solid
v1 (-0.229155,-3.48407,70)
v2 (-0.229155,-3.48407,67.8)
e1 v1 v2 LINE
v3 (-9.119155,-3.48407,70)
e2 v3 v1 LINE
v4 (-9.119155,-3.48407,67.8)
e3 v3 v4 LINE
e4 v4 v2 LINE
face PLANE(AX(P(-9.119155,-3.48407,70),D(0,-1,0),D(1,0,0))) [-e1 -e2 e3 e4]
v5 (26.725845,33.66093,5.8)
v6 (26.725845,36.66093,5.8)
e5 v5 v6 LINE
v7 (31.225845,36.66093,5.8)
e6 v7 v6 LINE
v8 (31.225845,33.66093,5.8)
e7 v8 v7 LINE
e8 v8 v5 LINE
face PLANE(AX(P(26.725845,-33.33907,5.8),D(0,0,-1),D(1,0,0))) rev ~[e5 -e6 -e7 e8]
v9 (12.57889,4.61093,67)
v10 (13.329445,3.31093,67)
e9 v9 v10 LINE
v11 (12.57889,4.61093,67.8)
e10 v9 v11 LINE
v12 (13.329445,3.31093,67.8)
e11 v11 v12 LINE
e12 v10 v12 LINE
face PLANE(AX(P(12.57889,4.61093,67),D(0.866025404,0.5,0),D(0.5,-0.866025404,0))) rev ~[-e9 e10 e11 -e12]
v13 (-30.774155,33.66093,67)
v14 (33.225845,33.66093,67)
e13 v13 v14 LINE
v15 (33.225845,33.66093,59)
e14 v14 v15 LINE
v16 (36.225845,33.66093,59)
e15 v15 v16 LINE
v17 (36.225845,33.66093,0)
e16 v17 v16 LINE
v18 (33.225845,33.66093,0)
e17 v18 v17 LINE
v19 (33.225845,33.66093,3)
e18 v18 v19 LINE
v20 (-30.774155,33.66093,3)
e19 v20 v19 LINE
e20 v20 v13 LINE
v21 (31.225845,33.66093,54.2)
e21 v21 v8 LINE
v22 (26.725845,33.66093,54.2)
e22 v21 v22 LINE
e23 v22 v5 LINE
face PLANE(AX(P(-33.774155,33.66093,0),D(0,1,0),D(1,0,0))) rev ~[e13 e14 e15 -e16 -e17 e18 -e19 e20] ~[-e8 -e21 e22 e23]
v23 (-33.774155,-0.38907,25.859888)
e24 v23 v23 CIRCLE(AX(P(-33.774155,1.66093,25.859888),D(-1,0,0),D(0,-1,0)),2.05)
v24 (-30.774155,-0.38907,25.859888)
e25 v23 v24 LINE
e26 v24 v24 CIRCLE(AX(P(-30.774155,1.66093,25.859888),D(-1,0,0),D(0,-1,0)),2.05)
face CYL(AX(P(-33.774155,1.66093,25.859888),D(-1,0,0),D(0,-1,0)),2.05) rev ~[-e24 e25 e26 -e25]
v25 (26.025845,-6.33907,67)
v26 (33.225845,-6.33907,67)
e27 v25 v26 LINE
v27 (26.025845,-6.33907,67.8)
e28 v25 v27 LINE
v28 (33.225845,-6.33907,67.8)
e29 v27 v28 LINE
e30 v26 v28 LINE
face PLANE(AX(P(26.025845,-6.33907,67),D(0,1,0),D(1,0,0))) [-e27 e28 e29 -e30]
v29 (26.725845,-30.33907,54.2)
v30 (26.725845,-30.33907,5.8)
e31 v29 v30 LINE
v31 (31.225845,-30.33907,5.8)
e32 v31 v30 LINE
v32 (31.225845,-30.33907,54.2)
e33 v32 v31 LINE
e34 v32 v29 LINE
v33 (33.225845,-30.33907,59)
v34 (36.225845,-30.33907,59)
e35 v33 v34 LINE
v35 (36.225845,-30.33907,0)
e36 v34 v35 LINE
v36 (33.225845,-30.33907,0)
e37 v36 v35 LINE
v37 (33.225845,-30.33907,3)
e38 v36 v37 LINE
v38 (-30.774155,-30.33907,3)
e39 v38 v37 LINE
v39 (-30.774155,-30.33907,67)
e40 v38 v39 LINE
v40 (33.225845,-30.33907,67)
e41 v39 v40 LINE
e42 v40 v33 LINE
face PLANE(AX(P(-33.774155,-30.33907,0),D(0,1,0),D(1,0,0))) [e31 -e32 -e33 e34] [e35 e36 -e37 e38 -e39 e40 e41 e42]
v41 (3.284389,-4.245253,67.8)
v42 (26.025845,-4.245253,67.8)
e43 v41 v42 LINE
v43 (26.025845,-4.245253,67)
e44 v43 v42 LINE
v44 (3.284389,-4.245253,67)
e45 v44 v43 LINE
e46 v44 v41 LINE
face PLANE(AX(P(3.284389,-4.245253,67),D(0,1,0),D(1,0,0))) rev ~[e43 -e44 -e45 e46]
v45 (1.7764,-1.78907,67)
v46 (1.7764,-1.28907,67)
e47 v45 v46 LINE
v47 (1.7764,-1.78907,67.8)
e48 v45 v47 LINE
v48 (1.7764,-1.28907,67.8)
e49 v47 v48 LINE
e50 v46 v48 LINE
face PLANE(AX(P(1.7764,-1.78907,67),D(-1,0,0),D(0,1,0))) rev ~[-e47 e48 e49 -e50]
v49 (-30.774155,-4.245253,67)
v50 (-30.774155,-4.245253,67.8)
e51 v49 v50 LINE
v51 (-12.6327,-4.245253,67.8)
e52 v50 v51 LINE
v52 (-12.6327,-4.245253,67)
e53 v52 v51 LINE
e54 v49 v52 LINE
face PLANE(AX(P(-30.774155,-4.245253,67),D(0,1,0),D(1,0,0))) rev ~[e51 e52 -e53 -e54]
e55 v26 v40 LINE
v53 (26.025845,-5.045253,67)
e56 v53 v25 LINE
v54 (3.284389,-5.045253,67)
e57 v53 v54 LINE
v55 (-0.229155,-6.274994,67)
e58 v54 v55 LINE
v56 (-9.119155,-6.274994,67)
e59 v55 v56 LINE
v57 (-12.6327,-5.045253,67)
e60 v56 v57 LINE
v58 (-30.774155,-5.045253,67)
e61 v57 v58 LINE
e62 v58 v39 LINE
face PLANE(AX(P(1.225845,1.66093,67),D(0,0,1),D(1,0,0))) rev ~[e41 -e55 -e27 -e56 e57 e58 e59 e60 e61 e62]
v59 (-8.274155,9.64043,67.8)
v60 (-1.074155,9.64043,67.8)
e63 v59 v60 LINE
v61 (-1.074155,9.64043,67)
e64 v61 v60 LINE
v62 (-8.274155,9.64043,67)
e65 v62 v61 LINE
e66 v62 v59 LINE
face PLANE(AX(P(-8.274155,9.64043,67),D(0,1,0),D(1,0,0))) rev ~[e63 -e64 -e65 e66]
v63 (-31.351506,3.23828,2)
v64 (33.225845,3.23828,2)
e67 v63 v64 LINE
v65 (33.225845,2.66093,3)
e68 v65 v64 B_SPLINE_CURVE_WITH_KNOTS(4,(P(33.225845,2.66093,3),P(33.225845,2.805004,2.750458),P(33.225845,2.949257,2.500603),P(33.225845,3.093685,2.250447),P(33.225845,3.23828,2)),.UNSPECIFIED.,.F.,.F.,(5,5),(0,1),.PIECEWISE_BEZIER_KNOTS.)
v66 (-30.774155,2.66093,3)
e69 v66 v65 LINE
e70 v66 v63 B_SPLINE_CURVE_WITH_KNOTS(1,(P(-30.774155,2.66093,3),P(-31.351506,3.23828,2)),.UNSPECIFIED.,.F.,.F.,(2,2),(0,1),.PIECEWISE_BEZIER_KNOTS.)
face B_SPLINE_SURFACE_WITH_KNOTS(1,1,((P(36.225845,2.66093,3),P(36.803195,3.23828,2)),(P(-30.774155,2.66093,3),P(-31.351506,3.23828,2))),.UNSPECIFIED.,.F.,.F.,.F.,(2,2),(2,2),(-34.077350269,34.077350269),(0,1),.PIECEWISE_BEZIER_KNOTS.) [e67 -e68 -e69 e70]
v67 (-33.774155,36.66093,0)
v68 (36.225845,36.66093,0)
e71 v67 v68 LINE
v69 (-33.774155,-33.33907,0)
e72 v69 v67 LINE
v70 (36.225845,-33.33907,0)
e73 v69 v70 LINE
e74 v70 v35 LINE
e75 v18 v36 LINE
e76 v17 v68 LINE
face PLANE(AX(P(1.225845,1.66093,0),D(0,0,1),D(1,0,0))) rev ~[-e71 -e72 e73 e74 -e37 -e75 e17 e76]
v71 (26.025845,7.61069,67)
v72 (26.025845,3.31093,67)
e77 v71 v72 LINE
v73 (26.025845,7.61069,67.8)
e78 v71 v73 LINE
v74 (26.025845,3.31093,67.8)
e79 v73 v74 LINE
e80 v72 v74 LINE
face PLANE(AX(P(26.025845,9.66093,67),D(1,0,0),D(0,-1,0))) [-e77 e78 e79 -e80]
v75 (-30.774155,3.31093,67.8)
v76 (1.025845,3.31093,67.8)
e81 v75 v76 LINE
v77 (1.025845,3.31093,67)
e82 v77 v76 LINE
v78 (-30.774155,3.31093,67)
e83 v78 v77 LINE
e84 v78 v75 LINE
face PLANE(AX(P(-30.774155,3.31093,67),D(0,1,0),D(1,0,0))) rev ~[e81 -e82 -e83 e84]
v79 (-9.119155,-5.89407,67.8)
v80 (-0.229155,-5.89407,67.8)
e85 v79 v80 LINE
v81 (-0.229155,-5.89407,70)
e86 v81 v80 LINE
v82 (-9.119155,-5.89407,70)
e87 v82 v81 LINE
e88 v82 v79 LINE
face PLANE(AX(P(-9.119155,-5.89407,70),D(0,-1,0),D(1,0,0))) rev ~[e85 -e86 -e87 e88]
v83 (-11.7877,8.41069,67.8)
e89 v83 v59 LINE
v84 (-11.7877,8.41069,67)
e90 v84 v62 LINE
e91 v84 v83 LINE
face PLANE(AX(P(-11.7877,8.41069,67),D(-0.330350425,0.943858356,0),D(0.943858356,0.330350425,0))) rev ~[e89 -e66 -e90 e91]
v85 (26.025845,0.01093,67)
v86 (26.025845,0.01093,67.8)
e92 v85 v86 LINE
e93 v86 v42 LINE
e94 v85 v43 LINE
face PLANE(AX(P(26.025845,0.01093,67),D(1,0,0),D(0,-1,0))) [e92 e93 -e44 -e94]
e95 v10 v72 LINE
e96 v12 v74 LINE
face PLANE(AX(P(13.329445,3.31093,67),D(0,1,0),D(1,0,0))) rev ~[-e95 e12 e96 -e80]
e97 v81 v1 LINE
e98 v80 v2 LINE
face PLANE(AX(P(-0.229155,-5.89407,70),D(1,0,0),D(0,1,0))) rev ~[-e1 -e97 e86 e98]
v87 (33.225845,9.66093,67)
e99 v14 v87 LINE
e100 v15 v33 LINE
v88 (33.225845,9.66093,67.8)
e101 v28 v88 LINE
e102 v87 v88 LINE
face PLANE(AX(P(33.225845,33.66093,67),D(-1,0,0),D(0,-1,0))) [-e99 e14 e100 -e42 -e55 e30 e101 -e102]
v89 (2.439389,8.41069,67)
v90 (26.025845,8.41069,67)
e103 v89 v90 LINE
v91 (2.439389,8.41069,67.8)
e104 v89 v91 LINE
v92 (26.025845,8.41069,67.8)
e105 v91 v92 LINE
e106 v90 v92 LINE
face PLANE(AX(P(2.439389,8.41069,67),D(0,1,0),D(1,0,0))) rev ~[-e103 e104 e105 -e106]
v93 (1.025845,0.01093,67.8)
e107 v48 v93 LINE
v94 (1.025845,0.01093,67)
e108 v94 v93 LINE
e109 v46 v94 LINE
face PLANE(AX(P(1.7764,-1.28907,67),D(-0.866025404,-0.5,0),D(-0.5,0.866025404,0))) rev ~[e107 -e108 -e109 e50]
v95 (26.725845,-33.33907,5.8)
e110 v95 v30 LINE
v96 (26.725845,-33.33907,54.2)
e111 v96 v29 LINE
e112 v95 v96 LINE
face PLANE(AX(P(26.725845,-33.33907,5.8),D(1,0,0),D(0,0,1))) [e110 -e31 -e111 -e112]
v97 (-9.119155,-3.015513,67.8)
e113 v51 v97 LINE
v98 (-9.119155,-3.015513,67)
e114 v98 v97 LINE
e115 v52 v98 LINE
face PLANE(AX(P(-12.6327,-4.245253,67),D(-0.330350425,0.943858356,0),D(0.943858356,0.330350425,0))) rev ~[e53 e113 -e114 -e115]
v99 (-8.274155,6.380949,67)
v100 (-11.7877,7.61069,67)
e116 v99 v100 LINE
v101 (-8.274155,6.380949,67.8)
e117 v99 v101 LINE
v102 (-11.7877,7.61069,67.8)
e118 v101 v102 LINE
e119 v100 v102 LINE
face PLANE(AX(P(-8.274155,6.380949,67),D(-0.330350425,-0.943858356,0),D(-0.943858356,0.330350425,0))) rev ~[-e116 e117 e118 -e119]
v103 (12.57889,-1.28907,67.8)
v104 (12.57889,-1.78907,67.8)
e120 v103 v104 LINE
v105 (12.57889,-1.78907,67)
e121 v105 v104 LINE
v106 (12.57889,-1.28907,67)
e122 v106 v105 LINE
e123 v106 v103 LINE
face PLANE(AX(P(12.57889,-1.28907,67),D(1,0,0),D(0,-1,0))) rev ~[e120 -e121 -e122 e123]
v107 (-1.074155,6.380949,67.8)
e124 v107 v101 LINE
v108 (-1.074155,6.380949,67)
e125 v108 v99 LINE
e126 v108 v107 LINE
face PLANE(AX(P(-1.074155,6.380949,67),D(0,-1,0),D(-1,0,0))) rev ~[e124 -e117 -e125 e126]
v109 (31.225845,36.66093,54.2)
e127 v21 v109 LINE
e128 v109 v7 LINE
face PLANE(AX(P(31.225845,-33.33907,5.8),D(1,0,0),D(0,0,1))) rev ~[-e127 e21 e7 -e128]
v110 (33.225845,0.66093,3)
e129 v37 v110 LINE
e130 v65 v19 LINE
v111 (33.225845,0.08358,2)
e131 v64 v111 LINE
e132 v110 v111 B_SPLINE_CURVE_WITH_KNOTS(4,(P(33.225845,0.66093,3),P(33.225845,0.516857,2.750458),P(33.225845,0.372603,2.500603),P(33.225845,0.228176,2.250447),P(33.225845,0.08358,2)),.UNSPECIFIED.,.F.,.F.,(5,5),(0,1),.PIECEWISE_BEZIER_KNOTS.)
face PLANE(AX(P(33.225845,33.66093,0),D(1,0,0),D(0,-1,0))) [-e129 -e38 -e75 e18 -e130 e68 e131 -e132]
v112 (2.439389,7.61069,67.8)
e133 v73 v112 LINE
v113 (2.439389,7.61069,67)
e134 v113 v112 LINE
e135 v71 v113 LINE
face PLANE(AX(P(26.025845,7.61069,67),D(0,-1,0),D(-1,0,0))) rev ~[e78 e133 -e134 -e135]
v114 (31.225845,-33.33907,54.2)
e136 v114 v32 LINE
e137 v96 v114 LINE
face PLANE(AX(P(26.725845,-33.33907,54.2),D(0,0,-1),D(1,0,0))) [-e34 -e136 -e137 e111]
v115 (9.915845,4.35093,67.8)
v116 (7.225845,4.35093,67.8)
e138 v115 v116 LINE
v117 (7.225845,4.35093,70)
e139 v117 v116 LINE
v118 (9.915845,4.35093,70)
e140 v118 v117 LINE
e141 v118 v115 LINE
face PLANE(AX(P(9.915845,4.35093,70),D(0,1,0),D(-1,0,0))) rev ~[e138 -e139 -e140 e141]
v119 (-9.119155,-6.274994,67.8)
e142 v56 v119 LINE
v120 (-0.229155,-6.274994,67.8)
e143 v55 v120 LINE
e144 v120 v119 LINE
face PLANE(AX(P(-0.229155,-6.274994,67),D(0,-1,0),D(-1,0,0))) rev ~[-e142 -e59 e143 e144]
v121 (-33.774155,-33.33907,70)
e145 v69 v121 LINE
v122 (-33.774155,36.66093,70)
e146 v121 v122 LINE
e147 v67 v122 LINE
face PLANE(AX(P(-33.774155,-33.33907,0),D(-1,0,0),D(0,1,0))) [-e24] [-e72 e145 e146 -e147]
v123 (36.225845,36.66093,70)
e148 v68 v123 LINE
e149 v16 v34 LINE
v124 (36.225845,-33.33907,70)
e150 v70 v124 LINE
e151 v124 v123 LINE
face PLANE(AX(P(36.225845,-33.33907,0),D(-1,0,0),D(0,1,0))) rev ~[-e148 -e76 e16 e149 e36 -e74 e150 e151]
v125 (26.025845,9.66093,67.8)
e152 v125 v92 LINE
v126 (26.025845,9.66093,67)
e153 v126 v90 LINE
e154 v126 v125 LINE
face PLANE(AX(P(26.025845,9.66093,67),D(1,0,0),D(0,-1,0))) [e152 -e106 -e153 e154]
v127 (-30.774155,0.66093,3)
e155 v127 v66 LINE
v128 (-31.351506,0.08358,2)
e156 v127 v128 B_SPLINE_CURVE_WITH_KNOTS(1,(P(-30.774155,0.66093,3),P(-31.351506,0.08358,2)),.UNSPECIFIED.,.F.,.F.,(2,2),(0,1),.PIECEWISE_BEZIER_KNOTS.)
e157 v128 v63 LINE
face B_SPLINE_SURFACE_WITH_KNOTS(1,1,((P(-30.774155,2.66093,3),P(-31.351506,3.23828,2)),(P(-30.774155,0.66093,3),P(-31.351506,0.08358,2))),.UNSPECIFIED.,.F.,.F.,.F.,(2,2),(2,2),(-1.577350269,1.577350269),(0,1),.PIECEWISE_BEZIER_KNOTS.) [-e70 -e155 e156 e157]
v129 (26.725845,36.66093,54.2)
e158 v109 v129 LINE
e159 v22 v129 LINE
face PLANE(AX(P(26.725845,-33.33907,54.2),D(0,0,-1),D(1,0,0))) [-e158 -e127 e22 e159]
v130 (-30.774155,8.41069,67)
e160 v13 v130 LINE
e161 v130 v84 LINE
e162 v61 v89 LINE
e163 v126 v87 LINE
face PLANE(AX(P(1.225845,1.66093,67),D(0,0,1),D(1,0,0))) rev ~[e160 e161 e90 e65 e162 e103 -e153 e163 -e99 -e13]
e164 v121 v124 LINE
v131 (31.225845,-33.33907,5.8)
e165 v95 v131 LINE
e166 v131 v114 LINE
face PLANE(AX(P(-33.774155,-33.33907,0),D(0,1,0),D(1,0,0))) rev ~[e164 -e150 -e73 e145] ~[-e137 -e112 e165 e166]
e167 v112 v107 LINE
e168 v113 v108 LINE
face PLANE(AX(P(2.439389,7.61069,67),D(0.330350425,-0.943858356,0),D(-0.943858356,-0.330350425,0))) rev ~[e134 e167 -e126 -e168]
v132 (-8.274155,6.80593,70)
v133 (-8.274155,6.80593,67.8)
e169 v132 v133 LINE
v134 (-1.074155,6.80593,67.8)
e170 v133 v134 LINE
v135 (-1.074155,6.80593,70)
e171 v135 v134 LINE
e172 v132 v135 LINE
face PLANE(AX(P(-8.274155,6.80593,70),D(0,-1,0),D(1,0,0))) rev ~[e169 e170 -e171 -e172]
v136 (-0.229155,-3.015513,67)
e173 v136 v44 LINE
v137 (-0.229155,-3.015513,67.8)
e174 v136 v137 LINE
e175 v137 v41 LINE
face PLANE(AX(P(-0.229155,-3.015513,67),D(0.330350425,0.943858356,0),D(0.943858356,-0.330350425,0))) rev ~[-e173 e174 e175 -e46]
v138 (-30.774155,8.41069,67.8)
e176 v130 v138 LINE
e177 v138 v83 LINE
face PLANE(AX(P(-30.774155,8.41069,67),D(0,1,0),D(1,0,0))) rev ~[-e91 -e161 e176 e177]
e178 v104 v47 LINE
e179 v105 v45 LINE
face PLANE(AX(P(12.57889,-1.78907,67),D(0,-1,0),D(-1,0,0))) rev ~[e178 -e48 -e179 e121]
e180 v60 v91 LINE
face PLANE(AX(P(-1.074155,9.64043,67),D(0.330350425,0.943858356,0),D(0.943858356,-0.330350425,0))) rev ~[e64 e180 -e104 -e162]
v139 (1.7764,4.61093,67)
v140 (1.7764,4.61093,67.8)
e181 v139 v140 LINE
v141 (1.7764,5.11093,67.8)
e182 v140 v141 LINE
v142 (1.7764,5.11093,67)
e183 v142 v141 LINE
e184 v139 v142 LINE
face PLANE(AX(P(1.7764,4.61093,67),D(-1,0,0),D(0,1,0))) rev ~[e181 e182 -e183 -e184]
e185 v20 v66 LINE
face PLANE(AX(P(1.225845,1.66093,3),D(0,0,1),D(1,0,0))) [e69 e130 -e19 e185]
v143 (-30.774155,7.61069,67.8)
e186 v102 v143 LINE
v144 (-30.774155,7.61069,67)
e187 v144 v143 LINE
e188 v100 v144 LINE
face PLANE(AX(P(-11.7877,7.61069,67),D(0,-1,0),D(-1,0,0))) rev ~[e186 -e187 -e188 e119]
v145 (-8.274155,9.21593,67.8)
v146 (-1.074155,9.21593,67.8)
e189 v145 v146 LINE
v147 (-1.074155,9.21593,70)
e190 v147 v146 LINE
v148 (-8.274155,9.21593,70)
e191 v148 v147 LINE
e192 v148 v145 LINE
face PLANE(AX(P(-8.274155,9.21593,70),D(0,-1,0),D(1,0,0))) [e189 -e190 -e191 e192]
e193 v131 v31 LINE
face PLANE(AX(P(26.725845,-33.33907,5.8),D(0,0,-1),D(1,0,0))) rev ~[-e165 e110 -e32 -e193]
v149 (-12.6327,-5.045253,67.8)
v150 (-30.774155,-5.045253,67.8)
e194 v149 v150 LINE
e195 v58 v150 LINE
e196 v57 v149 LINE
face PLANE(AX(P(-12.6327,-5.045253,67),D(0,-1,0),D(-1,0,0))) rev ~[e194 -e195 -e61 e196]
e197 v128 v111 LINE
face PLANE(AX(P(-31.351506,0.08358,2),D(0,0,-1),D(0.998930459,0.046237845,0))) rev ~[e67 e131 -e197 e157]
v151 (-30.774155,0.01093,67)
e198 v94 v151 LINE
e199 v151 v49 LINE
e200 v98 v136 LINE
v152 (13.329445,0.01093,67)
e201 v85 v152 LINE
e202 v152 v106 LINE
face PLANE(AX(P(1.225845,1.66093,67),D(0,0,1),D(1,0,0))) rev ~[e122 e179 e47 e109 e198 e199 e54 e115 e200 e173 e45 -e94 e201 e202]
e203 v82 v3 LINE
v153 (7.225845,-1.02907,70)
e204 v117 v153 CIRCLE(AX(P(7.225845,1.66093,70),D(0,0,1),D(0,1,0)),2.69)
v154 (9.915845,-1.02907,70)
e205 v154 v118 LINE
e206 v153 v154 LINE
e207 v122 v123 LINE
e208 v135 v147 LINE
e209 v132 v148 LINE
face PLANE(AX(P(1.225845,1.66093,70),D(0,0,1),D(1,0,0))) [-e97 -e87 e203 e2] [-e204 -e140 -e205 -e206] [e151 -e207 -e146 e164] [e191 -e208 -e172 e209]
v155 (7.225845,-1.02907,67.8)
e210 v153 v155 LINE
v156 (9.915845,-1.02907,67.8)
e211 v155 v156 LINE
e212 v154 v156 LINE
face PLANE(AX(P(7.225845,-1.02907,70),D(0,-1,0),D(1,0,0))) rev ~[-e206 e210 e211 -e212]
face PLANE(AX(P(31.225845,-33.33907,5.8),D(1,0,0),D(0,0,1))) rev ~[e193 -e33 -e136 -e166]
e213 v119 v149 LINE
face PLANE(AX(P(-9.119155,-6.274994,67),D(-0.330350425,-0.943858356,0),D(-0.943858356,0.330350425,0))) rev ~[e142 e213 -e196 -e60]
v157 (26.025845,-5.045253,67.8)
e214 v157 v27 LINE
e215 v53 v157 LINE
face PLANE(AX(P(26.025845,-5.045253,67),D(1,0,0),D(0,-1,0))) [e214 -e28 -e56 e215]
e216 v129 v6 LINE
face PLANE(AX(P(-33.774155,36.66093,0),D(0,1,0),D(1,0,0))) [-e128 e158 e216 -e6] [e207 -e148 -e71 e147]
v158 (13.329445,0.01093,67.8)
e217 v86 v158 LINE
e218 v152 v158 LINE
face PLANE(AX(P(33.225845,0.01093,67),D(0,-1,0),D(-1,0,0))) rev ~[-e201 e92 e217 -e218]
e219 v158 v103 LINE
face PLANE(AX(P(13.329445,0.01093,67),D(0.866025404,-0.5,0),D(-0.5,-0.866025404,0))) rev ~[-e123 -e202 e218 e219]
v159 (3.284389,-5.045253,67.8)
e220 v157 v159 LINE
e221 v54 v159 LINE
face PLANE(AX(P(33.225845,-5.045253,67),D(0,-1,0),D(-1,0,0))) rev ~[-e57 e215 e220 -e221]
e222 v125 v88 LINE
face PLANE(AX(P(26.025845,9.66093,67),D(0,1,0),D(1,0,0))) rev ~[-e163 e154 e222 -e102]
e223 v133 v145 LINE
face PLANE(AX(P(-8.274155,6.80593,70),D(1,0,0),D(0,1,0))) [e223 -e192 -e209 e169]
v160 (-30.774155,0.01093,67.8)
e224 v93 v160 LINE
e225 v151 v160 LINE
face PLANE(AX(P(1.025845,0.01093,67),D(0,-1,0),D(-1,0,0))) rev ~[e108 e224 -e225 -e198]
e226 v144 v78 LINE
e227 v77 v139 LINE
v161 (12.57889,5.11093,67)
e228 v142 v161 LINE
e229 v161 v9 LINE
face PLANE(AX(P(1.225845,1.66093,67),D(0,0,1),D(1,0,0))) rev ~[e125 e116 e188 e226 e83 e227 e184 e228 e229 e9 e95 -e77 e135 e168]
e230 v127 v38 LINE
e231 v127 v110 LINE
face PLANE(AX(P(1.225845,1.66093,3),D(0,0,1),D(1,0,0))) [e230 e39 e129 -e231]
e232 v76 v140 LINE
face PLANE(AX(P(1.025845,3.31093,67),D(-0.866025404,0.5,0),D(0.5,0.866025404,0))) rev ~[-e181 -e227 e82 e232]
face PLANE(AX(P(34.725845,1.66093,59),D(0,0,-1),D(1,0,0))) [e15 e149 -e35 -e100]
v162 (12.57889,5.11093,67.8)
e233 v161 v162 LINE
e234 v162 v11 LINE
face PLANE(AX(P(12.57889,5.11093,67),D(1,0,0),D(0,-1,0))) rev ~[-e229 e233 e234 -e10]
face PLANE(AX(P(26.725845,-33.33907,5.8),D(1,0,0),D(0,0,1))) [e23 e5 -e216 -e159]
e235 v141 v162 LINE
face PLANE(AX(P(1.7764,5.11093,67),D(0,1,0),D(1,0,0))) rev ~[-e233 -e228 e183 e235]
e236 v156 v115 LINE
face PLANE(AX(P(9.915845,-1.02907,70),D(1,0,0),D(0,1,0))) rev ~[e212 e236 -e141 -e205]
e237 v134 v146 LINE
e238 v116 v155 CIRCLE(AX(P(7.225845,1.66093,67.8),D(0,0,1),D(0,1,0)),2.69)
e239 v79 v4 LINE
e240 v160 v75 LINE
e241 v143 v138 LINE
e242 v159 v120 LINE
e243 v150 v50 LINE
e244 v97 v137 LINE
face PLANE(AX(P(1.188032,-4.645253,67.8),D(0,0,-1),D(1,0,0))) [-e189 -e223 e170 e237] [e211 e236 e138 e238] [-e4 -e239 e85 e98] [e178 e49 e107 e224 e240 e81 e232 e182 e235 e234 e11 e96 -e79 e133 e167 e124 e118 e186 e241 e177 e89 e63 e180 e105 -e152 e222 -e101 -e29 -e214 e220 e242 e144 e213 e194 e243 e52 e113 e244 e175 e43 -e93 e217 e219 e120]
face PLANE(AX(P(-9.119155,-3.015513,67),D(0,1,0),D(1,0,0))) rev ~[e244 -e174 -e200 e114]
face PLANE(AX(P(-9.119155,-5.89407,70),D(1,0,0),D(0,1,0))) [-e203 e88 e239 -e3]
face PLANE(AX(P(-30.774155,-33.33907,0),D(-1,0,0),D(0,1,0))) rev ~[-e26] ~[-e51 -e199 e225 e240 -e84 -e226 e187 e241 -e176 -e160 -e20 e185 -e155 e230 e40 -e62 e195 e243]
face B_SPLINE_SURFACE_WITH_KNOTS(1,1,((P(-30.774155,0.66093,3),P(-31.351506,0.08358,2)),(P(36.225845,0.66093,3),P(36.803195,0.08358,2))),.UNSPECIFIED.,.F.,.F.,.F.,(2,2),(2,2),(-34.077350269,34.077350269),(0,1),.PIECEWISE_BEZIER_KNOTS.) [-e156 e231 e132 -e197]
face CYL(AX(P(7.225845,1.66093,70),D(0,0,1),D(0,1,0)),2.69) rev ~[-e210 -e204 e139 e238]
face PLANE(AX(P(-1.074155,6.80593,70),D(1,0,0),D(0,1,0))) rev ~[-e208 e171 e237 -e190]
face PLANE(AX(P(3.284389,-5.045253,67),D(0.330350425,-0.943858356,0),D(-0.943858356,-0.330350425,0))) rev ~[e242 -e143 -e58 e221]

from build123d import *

# Parameters (mm, degrees)
F0_W      = 70
F0_H      = 70
F1_DEPTH  = 70
F2_T      = -3
F3_W      = 8.89
F3_H      = 2.41
F3_W_2    = 7.2
F4_DEPTH  = 2.54
F5_W      = 3
F5_H      = 64
F6_DEPTH  = 8
F7_R      = 2.05
F8_DEPTH  = 3.302
F9_W      = 4.5
F9_H      = 48.4
F10_DEPTH = 99.568
F11_W     = 67
F11_H     = 2
F12_DEPTH = 1
F12_TAPER = -30
F14_DEPTH = 0.8
F16_DEPTH = 0.8
F17_W     = 7.2
F17_H     = 1.2938163138
F17_H_2   = 4.2561836862
F17_H_3   = 6.35
F18_DEPTH = 0.8
F20_DEPTH = 0.8
F21_W     = 3
F21_H     = 64
F22_DEPTH = 4.6


# Not quite as in the source:
# - a feature names something its author has since deleted; it is built from what else it names


with BuildPart() as f1:
    # F0 (on Top) → F1 (new body)
    with BuildSketch(Plane.XY):
        with Locations((1.2258447155, 1.6609302163)):
            Rectangle(F0_W, F0_H)
    extrude(amount=F1_DEPTH)

    # F2
    f2_openings = [f1.faces().sort_by_distance(p)[0] for p in [
        (36.225845, 1.66093, 35),
    ]]
    offset(amount=F2_T, openings=f2_openings)

    # F3 (on face) → F4 (cut)
    with BuildSketch(Plane.XY.offset(70)):
        with Locations((-4.6741552845, -4.6890697837)):
            Rectangle(F3_W, F3_H)
        with BuildLine():
            ThreePointArc((7.2258447155, -1.0290697837), (9.1279619569, -0.2411870251), (9.9158447155, 1.6609302163))
            ThreePointArc((9.9158447155, 1.6609302163), (9.1279619569, 3.5630474577), (7.2258447155, 4.3509302163))
            ThreePointArc((7.2258447155, 4.3509302163), (4.5358447155, 1.6609302163), (7.2258447155, -1.0290697837))
        make_face()
        with BuildLine():
            Line((9.9158447155, -1.0290697837), (9.9158447155, 1.6609302163))
            ThreePointArc((9.9158447155, 1.6609302163), (9.1279619569, -0.2411870251), (7.2258447155, -1.0290697837))
            Line((7.2258447155, -1.0290697837), (9.9158447155, -1.0290697837))
        make_face()
        with Locations((-4.6741552845, 8.0109302163)):
            Rectangle(F3_W_2, F3_H)
        with BuildLine():
            ThreePointArc((7.2258447155, 4.3509302163), (9.1279619569, 3.5630474577), (9.9158447155, 1.6609302163))
            Line((9.9158447155, 1.6609302163), (9.9158447155, 4.3509302163))
            Line((9.9158447155, 4.3509302163), (7.2258447155, 4.3509302163))
        make_face()
    extrude(amount=-F4_DEPTH, mode=Mode.SUBTRACT)

    # F5 (on face) → F6 (join)
    with BuildSketch(Plane(origin=(0, 0, 67), x_dir=(1, 0, 0), z_dir=(0, 0, -1))):
        with Locations((34.7258447155, -1.6609302163)):
            Rectangle(F5_W, F5_H)
    extrude(amount=F6_DEPTH)

    # F7 (on face) → F8 (cut)
    with BuildSketch(Plane(origin=(-33.7741552845, 0, 0), x_dir=(0, -1, 0), z_dir=(-1, 0, 0))):
        with Locations((-1.6609302163, 25.8598876931)):
            Circle(F7_R)
    extrude(amount=-F8_DEPTH, mode=Mode.SUBTRACT)

    # F9 (on face) → F10 (cut)
    with BuildSketch(Plane.XZ.offset(33.3390697837)):
        with Locations((28.9758447155, 30)):
            Rectangle(F9_W, F9_H)
    extrude(amount=-F10_DEPTH, mode=Mode.SUBTRACT)

    # F11 (on face) → F12 (cut)
    with BuildSketch(Plane.XY.offset(3)):
        with Locations((2.7258447155, 1.6609302163)):
            Rectangle(F11_W, F11_H)
    extrude(amount=-F12_DEPTH, taper=F12_TAPER, mode=Mode.SUBTRACT)

    # F13 (on face) → F14 (cut)
    with BuildSketch(Plane(origin=(0, 0, 67), x_dir=(1, 0, 0), z_dir=(0, 0, -1))):
        Polygon((-30.7741552845, -0.0109302163), (-30.7741552845, -3.3109302163), (1.0258447155, -3.3109302163), (1.7764000655, -4.6109302163), (1.7764000655, -5.1109302163), (12.5788900655, -5.1109302163), (12.5788900655, -4.6109302163), (13.3294454154, -3.3109302163), (33.2258447155, -3.3109302163), (33.2258447155, -0.0109302163), (13.3294454154, -0.0109302163), (12.5788900655, 1.2890697837), (12.5788900655, 1.7890697837), (1.7764000655, 1.7890697837), (1.7764000655, 1.2890697837), (1.0258447155, -0.0109302163), align=None)
    extrude(amount=-F14_DEPTH, mode=Mode.SUBTRACT)

    # F15 (on face) → F16 (cut)
    with BuildSketch(Plane(origin=(0, 0, 67), x_dir=(1, 0, 0), z_dir=(0, 0, -1))):
        Polygon((-30.7741552845, 5.0452534699), (-30.7741552845, 4.2452534699), (-12.6326995774, 4.2452534699), (-9.1191552845, 3.0155129674), (-0.2291552845, 3.0155129674), (3.2843890084, 4.2452534699), (33.2258447155, 4.2452534699), (33.2258447155, 5.0452534699), (3.2843890084, 5.0452534699), (-0.2291552845, 6.2749939724), (-9.1191552845, 6.2749939724), (-12.6326995774, 5.0452534699), align=None)
    extrude(amount=-F16_DEPTH, mode=Mode.SUBTRACT)

    # F17 (on face) → F18 (cut)
    with BuildSketch(Plane(origin=(0, 0, 67), x_dir=(1, 0, 0), z_dir=(0, 0, -1))):
        with Locations((29.6258447155, 5.6921616268)):
            Rectangle(F17_W, F17_H)
        with Locations((29.6258447155, 2.1171616268)):
            Rectangle(F17_W, F17_H_2)
        with Locations((29.6258447155, -6.4859302163)):
            Rectangle(F17_W, F17_H_3)
    extrude(amount=-F18_DEPTH, mode=Mode.SUBTRACT)

    # F19 (on face) → F20 (cut)
    with BuildSketch(Plane(origin=(0, 0, 67), x_dir=(1, 0, 0), z_dir=(0, 0, -1))):
        Polygon((26.0258447155, -8.4106897138), (26.0258447155, -7.6106897138), (2.4393890084, -7.6106897138), (-1.0741552845, -6.3809492113), (-8.2741552845, -6.3809492113), (-11.7876995774, -7.6106897138), (-30.7741552845, -7.6106897138), (-30.7741552845, -8.4106897138), (-11.7876995774, -8.4106897138), (-8.2741552845, -9.6404302163), (-1.0741552845, -9.6404302163), (2.4393890084, -8.4106897138), align=None)
    extrude(amount=-F20_DEPTH, mode=Mode.SUBTRACT)

    # F21 (on face) → F22 (cut)
    with BuildSketch(Plane(origin=(0, 0, 0), x_dir=(1, 0, 0), z_dir=(0, 0, -1))):
        with Locations((34.7258447155, -1.6609302163)):
            Rectangle(F21_W, F21_H)
    extrude(amount=-F22_DEPTH, mode=Mode.SUBTRACT)


solid = f1.part
